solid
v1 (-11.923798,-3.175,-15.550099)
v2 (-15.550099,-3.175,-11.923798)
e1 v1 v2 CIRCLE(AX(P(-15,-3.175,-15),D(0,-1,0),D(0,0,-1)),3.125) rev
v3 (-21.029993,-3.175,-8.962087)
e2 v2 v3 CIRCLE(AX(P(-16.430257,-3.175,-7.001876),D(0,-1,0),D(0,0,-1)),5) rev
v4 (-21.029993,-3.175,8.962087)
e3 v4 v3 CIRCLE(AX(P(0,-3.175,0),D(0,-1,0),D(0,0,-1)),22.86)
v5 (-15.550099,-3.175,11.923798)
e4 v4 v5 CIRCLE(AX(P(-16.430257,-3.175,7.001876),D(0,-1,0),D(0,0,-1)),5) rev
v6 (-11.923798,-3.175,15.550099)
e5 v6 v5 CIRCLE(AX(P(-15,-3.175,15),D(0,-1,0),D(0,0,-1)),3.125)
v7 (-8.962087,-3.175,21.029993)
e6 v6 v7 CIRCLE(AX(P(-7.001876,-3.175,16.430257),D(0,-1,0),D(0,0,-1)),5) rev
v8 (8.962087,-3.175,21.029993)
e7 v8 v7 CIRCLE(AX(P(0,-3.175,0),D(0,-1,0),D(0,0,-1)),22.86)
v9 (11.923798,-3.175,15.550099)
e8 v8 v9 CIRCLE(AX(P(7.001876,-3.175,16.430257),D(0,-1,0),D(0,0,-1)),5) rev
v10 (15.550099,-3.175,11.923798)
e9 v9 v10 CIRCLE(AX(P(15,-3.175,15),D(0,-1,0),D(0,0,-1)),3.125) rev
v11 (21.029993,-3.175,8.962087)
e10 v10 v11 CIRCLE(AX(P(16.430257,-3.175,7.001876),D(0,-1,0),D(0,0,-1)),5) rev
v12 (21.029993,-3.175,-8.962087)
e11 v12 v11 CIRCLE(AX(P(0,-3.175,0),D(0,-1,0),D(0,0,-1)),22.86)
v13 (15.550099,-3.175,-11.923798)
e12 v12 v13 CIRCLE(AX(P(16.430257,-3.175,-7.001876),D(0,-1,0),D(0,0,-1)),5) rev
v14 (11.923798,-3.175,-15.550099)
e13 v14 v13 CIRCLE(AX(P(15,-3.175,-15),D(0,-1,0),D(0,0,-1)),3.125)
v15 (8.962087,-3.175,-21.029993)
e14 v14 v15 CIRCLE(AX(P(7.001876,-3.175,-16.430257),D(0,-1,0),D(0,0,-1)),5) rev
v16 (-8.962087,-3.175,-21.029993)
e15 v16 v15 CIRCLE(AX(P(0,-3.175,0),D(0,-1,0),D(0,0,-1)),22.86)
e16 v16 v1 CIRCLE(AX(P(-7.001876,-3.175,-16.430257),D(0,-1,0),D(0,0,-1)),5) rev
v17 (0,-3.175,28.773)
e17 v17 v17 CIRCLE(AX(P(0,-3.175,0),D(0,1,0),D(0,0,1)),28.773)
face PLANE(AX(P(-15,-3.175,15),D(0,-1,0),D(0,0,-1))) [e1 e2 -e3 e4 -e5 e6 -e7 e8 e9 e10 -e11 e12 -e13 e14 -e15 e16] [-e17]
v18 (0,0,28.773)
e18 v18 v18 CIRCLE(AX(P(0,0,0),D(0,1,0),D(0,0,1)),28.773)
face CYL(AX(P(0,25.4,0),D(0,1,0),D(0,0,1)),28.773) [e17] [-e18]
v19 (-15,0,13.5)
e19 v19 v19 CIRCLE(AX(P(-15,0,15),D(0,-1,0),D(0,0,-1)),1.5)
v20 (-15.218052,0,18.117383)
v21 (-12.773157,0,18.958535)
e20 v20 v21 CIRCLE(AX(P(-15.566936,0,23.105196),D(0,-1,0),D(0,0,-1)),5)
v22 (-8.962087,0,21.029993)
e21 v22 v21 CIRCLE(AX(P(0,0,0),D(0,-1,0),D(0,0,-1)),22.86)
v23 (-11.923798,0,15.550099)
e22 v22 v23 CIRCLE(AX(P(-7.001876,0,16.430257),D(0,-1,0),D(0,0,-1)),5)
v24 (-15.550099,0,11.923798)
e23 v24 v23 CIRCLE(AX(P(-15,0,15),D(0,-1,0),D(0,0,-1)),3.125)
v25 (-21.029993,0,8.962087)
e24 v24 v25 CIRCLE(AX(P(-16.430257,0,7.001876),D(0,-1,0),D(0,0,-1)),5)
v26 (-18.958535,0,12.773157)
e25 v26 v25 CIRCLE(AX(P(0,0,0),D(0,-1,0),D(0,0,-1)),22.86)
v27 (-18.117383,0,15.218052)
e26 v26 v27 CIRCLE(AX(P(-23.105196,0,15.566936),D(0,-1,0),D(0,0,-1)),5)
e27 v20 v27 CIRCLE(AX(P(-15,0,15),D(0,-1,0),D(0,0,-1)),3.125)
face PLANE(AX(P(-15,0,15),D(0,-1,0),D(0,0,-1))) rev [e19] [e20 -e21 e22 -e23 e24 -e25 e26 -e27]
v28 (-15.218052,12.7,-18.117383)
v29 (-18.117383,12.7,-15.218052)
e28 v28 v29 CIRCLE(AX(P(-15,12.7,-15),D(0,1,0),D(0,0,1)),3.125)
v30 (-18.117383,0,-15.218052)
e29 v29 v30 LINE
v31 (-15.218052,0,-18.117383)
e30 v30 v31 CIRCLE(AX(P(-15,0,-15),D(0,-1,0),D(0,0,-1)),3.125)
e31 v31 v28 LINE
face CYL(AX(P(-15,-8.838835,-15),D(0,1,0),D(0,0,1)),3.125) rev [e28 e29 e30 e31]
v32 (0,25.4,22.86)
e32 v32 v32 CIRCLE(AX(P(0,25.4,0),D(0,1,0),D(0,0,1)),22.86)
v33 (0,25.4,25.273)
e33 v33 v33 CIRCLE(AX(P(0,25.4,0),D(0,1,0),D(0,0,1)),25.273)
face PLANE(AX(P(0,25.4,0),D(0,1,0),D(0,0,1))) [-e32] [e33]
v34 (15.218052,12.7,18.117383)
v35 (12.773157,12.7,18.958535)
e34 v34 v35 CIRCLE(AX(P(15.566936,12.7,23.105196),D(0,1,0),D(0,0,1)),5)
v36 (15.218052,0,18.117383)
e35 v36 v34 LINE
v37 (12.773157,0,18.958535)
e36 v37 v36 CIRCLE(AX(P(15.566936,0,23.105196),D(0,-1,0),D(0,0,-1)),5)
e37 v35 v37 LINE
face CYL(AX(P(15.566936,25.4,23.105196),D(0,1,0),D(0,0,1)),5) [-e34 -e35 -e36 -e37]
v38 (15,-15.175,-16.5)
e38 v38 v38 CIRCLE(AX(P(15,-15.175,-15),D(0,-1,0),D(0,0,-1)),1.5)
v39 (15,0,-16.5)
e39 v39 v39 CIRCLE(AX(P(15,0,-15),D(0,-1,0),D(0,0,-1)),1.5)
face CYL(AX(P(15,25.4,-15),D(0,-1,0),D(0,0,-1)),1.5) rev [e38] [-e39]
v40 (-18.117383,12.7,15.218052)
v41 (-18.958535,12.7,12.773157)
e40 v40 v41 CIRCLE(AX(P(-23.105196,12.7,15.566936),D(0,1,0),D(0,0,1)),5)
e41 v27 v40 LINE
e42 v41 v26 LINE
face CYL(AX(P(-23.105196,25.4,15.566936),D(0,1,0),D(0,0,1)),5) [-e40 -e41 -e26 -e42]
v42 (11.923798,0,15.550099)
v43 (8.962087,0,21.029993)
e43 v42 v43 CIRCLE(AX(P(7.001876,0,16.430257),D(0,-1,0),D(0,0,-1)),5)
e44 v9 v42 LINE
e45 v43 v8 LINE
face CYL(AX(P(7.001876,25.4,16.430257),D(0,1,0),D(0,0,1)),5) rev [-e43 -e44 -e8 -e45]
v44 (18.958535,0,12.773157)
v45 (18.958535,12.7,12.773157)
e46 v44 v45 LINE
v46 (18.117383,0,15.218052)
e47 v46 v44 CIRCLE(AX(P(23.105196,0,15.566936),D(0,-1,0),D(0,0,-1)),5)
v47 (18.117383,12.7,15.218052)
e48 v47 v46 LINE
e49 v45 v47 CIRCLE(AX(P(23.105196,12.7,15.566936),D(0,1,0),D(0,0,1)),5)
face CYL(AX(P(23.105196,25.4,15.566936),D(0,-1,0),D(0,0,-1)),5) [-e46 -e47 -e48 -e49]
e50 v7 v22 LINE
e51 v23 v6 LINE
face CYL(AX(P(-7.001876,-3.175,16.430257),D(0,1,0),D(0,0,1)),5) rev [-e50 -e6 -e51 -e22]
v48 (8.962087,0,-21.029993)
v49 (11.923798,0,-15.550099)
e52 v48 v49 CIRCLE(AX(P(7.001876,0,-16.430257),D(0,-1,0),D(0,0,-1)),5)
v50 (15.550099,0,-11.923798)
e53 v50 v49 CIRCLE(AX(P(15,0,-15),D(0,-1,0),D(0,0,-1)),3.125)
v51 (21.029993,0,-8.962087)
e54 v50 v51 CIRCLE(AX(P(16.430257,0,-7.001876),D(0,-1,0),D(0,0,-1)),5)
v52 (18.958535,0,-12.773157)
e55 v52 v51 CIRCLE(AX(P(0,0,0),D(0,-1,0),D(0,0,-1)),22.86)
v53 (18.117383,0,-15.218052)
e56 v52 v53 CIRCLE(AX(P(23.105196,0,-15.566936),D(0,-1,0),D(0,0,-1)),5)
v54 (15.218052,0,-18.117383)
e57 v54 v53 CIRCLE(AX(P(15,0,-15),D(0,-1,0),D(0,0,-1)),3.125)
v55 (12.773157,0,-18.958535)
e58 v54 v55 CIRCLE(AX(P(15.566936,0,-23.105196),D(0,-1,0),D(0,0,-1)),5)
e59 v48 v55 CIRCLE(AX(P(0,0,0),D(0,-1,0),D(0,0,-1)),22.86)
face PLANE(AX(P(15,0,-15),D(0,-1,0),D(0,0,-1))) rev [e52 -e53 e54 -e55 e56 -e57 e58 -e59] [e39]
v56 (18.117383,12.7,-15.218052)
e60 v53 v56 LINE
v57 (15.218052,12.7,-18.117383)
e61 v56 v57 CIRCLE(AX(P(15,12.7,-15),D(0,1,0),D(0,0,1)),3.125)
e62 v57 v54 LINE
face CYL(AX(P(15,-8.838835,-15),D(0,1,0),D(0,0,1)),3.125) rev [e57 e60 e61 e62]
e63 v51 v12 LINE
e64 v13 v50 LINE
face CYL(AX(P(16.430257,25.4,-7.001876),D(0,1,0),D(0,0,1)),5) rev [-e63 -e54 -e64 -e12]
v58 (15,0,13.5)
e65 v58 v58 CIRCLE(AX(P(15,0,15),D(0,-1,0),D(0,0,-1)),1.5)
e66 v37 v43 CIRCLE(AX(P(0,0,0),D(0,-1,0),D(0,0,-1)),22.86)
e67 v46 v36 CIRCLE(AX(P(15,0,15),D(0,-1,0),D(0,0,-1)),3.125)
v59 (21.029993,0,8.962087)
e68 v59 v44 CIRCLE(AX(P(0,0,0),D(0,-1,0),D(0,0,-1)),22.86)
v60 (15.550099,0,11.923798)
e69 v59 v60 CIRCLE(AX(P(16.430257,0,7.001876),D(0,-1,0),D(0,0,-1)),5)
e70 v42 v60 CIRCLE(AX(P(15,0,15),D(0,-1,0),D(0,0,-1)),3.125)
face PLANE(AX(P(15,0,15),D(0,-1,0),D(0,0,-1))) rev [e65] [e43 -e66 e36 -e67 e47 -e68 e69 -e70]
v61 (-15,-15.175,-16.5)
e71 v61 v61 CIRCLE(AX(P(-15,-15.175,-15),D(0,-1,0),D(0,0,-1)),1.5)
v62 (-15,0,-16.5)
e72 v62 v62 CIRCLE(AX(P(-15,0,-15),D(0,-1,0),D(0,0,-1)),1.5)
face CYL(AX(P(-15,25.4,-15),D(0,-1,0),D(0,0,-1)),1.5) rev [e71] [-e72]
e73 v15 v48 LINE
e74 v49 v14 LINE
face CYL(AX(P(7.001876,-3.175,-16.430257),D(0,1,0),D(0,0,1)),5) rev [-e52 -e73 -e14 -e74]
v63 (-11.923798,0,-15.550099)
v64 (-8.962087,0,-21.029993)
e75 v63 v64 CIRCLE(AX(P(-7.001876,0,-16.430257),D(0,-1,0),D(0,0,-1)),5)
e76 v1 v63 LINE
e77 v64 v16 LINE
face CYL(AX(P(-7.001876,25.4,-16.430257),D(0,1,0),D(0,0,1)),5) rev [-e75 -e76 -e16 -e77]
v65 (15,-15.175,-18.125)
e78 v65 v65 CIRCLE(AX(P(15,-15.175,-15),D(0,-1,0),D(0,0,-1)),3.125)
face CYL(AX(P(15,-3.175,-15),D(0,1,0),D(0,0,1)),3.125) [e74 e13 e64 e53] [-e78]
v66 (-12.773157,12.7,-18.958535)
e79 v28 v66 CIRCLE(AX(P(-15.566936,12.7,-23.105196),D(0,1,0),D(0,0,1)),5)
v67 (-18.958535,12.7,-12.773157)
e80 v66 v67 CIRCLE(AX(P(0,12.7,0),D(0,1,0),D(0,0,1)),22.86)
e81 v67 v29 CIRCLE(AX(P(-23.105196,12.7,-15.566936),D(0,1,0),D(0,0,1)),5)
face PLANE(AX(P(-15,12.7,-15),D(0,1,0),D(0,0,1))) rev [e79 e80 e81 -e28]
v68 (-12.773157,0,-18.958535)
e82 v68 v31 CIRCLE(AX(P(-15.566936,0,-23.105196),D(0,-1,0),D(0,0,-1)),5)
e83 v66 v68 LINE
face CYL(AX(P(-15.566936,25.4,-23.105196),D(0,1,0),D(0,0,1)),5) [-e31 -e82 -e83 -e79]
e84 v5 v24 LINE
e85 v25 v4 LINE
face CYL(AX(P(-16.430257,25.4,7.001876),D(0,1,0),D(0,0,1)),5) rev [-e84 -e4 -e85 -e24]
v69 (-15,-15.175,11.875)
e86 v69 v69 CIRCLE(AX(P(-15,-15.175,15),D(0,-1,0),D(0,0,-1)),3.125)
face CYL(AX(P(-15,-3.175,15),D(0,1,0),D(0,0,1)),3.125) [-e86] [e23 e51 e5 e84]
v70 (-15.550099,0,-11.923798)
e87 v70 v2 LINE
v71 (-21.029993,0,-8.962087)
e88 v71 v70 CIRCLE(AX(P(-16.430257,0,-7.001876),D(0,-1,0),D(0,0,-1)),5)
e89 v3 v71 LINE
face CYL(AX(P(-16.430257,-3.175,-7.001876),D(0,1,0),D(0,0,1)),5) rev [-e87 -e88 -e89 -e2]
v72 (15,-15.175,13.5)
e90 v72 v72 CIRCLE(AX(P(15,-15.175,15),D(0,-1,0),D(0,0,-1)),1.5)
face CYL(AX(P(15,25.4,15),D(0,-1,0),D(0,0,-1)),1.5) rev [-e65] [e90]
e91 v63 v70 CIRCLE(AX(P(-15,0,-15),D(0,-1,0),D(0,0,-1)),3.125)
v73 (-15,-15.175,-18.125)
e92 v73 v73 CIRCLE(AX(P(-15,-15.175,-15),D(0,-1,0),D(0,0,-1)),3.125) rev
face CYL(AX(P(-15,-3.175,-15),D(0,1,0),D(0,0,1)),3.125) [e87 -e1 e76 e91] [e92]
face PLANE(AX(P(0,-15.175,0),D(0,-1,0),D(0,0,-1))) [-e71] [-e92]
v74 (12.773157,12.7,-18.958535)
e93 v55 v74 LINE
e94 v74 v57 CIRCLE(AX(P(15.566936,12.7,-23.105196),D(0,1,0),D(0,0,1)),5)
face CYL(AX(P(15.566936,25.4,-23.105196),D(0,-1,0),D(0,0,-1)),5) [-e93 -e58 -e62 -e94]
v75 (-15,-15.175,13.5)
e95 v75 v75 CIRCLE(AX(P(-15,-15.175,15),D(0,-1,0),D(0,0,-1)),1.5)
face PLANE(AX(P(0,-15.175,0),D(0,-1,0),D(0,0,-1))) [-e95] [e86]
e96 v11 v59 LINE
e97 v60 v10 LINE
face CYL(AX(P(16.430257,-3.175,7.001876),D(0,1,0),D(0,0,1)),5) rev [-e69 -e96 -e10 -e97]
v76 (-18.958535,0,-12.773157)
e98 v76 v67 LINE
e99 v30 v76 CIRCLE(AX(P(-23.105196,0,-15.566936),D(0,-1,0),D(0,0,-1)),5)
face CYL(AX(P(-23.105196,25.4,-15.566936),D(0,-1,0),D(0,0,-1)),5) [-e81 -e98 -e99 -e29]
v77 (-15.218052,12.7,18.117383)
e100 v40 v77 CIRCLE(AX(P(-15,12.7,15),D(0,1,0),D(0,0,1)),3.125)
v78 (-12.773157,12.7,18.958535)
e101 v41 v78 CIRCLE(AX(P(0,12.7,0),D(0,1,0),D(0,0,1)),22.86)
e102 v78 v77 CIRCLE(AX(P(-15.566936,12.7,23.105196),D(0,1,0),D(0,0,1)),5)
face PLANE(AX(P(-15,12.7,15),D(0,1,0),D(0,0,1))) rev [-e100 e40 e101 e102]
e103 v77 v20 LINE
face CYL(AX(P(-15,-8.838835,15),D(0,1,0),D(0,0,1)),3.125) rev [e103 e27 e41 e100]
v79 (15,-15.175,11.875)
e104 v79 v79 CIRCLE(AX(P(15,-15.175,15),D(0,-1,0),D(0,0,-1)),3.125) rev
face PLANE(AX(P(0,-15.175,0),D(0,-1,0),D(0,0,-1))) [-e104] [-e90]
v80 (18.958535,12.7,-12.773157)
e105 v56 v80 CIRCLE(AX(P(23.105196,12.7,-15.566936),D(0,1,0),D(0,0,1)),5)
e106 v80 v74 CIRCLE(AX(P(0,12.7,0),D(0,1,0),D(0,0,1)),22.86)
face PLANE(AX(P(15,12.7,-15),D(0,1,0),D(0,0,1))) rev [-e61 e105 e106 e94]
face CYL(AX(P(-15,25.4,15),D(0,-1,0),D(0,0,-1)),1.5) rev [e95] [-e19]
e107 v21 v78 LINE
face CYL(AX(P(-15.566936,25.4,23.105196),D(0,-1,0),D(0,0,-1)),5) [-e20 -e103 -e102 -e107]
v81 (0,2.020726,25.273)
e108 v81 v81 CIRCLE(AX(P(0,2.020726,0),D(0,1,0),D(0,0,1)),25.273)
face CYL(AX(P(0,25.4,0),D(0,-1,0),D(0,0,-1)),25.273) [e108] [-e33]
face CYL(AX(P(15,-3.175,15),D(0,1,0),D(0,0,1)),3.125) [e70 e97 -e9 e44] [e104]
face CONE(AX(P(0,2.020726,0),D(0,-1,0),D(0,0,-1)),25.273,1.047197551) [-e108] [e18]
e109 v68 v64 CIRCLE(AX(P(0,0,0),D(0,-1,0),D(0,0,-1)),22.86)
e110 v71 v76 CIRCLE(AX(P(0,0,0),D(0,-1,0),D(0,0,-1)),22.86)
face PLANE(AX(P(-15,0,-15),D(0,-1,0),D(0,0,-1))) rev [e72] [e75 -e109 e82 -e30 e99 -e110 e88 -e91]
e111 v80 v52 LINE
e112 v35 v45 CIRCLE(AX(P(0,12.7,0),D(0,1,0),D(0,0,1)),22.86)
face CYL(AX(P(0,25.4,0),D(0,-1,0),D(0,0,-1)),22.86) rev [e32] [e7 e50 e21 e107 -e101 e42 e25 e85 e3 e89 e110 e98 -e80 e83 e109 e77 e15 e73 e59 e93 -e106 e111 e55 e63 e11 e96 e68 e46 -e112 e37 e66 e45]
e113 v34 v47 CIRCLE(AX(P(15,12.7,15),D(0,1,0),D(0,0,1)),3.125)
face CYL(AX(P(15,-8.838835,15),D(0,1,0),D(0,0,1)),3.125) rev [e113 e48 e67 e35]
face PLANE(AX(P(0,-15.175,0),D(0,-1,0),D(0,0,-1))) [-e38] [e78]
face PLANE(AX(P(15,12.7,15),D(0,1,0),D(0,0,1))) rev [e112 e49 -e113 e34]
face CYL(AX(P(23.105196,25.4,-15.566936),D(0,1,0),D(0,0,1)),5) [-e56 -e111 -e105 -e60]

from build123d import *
from build123d.topology import SkipClean

# Parameters (mm, degrees)
SKETCH1_R               = 25.273
SKETCH1_R_2             = 22.86
BOSS_EXTRUDE1_DEPTH     = 25.4
SKETCH6_R               = 3.1250000000000004
SKETCH6_R_2             = 3.125000000000001
SKETCH6_R_3             = 3.125000000000005
BOSS_EXTRUDE2_DEPTH     = 3.175
SKETCH5_R               = 3.1250000000000004
SKETCH5_R_2             = 3.125000000000004
SKETCH5_R_3             = 3.125000000000001
CUT_EXTRUDE1_DEPTH      = 12.7
SKETCH10_R              = 25.273
BOSS_EXTRUDE3_DEPTH     = 3.175
CUT_EXTRUDE2_DEPTH      = 44.84756615822593
CUT_EXTRUDE2_DEPTH_BACK = 44.84756615822593
SKETCH3_R               = 1.2500000000000007
FILLET1_R               = 5
FILLET3_R               = 5
SKETCH11_R              = 1.2500000000000013
BOSS_EXTRUDE4_DEPTH     = 12
SKETCH13_R              = 1.5000000000000009
SKETCH13_R_2            = 1.5000000000000002
CUT_EXTRUDE3_DEPTH      = 55.07198619539511
SKETCH14_W              = 3.5
SKETCH14_H              = 3.174999999999997
CHAMFER1_SIZE           = 2.020725942
CHAMFER1_SIZE_2         = 3.5


with BuildPart() as part:
    # Sketch1 → Boss-Extrude1 (new body)
    with BuildSketch(Plane(origin=(0, 0, 0), x_dir=(1, 0, 0), z_dir=(0, 1, 0))):
        with Locations(Location((0, 0, 0), (0, 0, 270))):
            Circle(SKETCH1_R)
        with Locations(Location((0, 0, 0), (0, 0, 270))):
            Circle(SKETCH1_R_2, mode=Mode.SUBTRACT)
    extrude(amount=BOSS_EXTRUDE1_DEPTH)

    # Sketch6 → Boss-Extrude2 (add)
    with BuildSketch(Plane.XZ):
        with Locations(Location((-15.000000000000004, 15, 0), (0, 0, 73.279468642))):
            Circle(SKETCH6_R)
        with Locations(Location((-14.999999999999996, -15.000000000000007, 0), (0, 0, 163.279468642))):
            Circle(SKETCH6_R_2)
        with Locations(Location((15.00000000000001, -14.999999999999993, 0), (0, 0, 16.720531358))):
            Circle(SKETCH6_R)
        with Locations(Location((15.000000000000004, 15, 0), (0, 0, 106.720531358))):
            Circle(SKETCH6_R_3)
    extrude(amount=BOSS_EXTRUDE2_DEPTH)

    # Sketch5 → Cut-Extrude1 (cut)
    with BuildSketch(Plane(origin=(0, 12.7, 0), x_dir=(1, 0, 0), z_dir=(0, 1, 0))):
        with Locations(Location((-14.999999999999996, 15.000000000000007, 0), (0, 0, 90))):
            Circle(SKETCH5_R)
        with Locations(Location((15.00000000000001, 14.999999999999993, 0), (0, 0, 90))):
            Circle(SKETCH5_R)
        with Locations(Location((15.000000000000004, -15, 0), (0, 0, 90))):
            Circle(SKETCH5_R_2)
        with Locations(Location((-15.000000000000004, -15, 0), (0, 0, 90))):
            Circle(SKETCH5_R_3)
    extrude(amount=-CUT_EXTRUDE1_DEPTH, mode=Mode.SUBTRACT)


with BuildPart() as cut_extrude1_piece_1:
    # of the separate pieces the step leaves, piece 1, a body of its own (cut_extrude1_pieces)
    add(part.part.solids().sort_by_distance((0, 0, 25.273))[0])



with BuildPart() as cut_extrude1_piece_2:
    # of the separate pieces the step leaves, piece 2, a body of its own (cut_extrude1_pieces)
    add(part.part.solids().sort_by_distance((14.100925852, -3.175, 17.992873315))[0])


with BuildPart() as cut_extrude1_piece_3:
    # of the separate pieces the step leaves, piece 3, a body of its own (cut_extrude1_pieces)
    add(part.part.solids().sort_by_distance((17.992873315, -3.175, -14.100925852))[0])


with BuildPart() as cut_extrude1_piece_4:
    # of the separate pieces the step leaves, piece 4, a body of its own (cut_extrude1_pieces)
    add(part.part.solids().sort_by_distance((-17.992873315, -3.175, -14.100925852))[0])


with BuildPart() as cut_extrude1_piece_5:
    # of the separate pieces the step leaves, piece 5, a body of its own (cut_extrude1_pieces)
    add(part.part.solids().sort_by_distance((-14.100925852, -3.175, 17.992873315))[0])


with BuildPart() as cut_extrude1_piece_1_1:
    with SkipClean():  # the faces are left unmerged after this step: merging them gives an invalid solid
        add(cut_extrude1_piece_1.part)

        add(cut_extrude1_piece_2.part)  # Boss-Extrude3 merges Cut-Extrude1 piece 2

        add(cut_extrude1_piece_3.part)  # Boss-Extrude3 merges Cut-Extrude1 piece 3

        add(cut_extrude1_piece_4.part)  # Boss-Extrude3 merges Cut-Extrude1 piece 4

        add(cut_extrude1_piece_5.part)  # Boss-Extrude3 merges Cut-Extrude1 piece 5
        # Sketch10 → Boss-Extrude3 (add)
        with BuildSketch(Plane.XZ):
            with Locations(Location((0, 0, 0), (0, 0, 270))):
                Circle(SKETCH10_R)
            with BuildLine():
                ThreePointArc((-17.992873314506625, 14.100925852160042), (-22.86, -7.35e-15), (-17.992873314506618, -14.100925852160044))
                ThreePointArc((-17.992873314506618, -14.100925852160044), (-17.209708691207958, -17.209708691207968), (-14.100925852160033, -17.992873314506628))
                ThreePointArc((-14.100925852160033, -17.992873314506628), (1.155e-14, -22.86), (14.10092585216005, -17.992873314506614))
                ThreePointArc((14.10092585216005, -17.992873314506614), (17.20970869120797, -17.209708691207954), (17.99287331450663, -14.10092585216003))
                ThreePointArc((17.99287331450663, -14.10092585216003), (22.86, 2.54e-15), (17.992873314506628, 14.100925852160033))
                ThreePointArc((17.992873314506628, 14.100925852160033), (17.209708691207968, 17.209708691207965), (14.100925852160037, 17.99287331450662))
                ThreePointArc((14.100925852160037, 17.99287331450662), (-8.75e-15, 22.859999999999996), (-14.10092585216005, 17.992873314506618))
                ThreePointArc((-14.10092585216005, 17.992873314506618), (-17.20970869120796, 17.209708691207958), (-17.992873314506625, 14.100925852160042))
            make_face(mode=Mode.SUBTRACT)
        extrude(amount=BOSS_EXTRUDE3_DEPTH)

    # Sketch3 → Cut-Extrude2 (cut, two sides: drawn at the far end of the back side and taken through both)
    with BuildSketch(Plane(origin=(0, 0, 0), x_dir=(-1, 0, 0), z_dir=(0, -1, 0)).offset(-CUT_EXTRUDE2_DEPTH_BACK)):
        with Locations(Location((-15.00000000000001, 14.999999999999993, 0), (0, 0, 90))):
            Circle(SKETCH3_R)
        with Locations(Location((14.999999999999996, 15.000000000000007, 0), (0, 0, 90))):
            Circle(SKETCH3_R)
        with Locations(Location((15.000000000000004, -15, 0), (0, 0, 90))):
            Circle(SKETCH3_R)
        with Locations(Location((-15.000000000000004, -15, 0), (0, 0, 90))):
            Circle(SKETCH3_R)
    extrude(amount=CUT_EXTRUDE2_DEPTH + CUT_EXTRUDE2_DEPTH_BACK, mode=Mode.SUBTRACT)

    # Fillet1
    # the kernel refuses this fillet: 5 mm, written as the material it adds along each edge
    with BuildSketch(Plane(origin=(14.10092585215273, 0, 17.99287331450443), x_dir=(-0.8608874223501668, 0, 0.5087954854745522), z_dir=(0, -1, 0))) as fillet1_piece_1:
        with BuildLine():
            CenterArc((5.3164306254297475, 4.957201606076887), FILLET1_R, 200.44493479768204, 77.05705788713391)
            ThreePointArc((0.631388974913585, 3.210666541175879), (0.7695099639794132, 1.5160888458409856), (0, 0))
            ThreePointArc((0, 0), (2.984616996499313, -0.19567425701646401), (5.969233992998208, 6e-17))
        make_face()
    extrude(amount=3.175)
    with BuildSketch(Plane(origin=(17.992873314504436, 0, -14.10092585215272), x_dir=(0.5087954854745508, 0, 0.8608874223501678), z_dir=(0, -1, 0))) as fillet1_piece_2:
        with BuildLine():
            CenterArc((5.316430625429749, 4.9572016060768895), FILLET1_R, 200.44493479768207, 77.05705788713385)
            ThreePointArc((0.6313889749135845, 3.2106665411758786), (0.7695099639794142, 1.5160888458409876), (0, 0))
            ThreePointArc((0, 0), (2.984616996499308, -0.19567425701646796), (5.9692339929982055, -1e-16))
        make_face()
    extrude(amount=3.175)
    with BuildSketch(Plane(origin=(-14.100925852160035, 0, -17.992873314506628), x_dir=(0.665348701330496, 0, 0.7465327224159852), z_dir=(0, -1, 0))) as fillet1_piece_3:
        with BuildLine():
            CenterArc((5.889888167974704, -4.259988230871161), FILLET1_R, 121.57038627249773, 77.05705788713396)
            ThreePointArc((1.1518105546258381, -5.857054456762352), (0.3839083174921323, -2.9662841122227417), (0, 0))
            ThreePointArc((0, 0), (1.6360800466596406, -0.46250735570552437), (3.2721600933192807, 3e-17))
        make_face()
    extrude(amount=3.175)
    with BuildSketch(Plane(origin=(-17.992873314506625, 0, 14.100925852160042), x_dir=(0.7465327224159842, 0, -0.6653487013304972), z_dir=(0, -1, 0))) as fillet1_piece_4:
        with BuildLine():
            CenterArc((5.889888167974704, -4.259988230871161), FILLET1_R, 121.57038627249773, 77.05705788713396)
            ThreePointArc((1.1518105546258386, -5.857054456762347), (0.38390831749212756, -2.96628411222273), (0, 0))
            ThreePointArc((0, 0), (1.6360800466596437, -0.4625073557055245), (3.2721600933192807, 8e-17))
        make_face()
    extrude(amount=3.175)
    with BuildSketch(Plane(origin=(17.99287331450663, 0, 14.100925852160035), x_dir=(-0.7465327224159862, 0, -0.665348701330495), z_dir=(0, -1, 0))) as fillet1_piece_5:
        with BuildLine():
            CenterArc((5.889888167974704, 4.2599882308711665), FILLET1_R, 161.3725558403684, 77.05705788713396)
            ThreePointArc((1.1518105546258386, 5.857054456762349), (0.38390831749213894, 2.9662841122227275), (0, 0))
            ThreePointArc((0, 0), (1.6360800466596428, 0.46250735570552437), (3.272160093319286, 6e-17))
        make_face()
    extrude(amount=3.175)
    with BuildSketch(Plane(origin=(-17.992873314504422, 0, -14.100925852152734), x_dir=(-0.5087954854745543, 0, 0.8608874223501657), z_dir=(0, -1, 0))) as fillet1_piece_6:
        with BuildLine():
            CenterArc((5.316430625429729, -4.957201606076887), FILLET1_R, 82.49800731518394, 77.05705788713391)
            ThreePointArc((0.631388974913567, -3.2106665411758706), (0.769509963979407, -1.5160888458409818), (0, 0))
            ThreePointArc((0, 0), (2.984616996499318, 0.19567425701647095), (5.969233992998199, -2.4e-16))
        make_face()
    extrude(amount=3.175)
    with BuildSketch(Plane(origin=(14.100925852160053, 0, -17.992873314506614), x_dir=(-0.860887422350645, 0, -0.5087954854737433), z_dir=(0, -1, 0))) as fillet1_piece_7:
        with BuildLine():
            CenterArc((5.31643062543959, -4.9572016060775015), FILLET1_R, 82.49800731523791, 77.05705788713382)
            ThreePointArc((0.631388974921786, -3.210666541180892), (0.7695099639852782, -1.5160888458421276), (0, 0))
            ThreePointArc((0, 0), (2.9846169965017046, 0.1956742570136652), (5.969233993003391, -1.1e-16))
        make_face()
    extrude(amount=3.175)
    with BuildSketch(Plane(origin=(-14.10092585215273, 0, 17.992873314504426), x_dir=(0.6653487013295846, 0, -0.7465327224167976), z_dir=(0, -1, 0))) as fillet1_piece_8:
        with BuildLine():
            CenterArc((5.889888167962995, 4.25998823087436), FILLET1_R, 161.3725558404384, 77.05705788713385)
            ThreePointArc((1.1518105546121764, 5.857054456759753), (0.38390831748250376, 2.9662841122217563), (0, 0))
            ThreePointArc((0, 0), (1.6360800466563894, 0.4625073557035249), (3.2721600933127744, -3e-17))
        make_face()
    extrude(amount=3.175)

    # Fillet3
    fillet3_edges = [cut_extrude1_piece_1_1.edges().sort_by_distance(p)[0] for p in [
        (17.99287331450661, 6.35, 14.100925852160058),
        (14.10092585216007, 6.35, -17.9928733145066),
        (-17.992873314506618, 6.349999999999999, -14.100925852160048),
        (14.100925852160062, 6.35, 17.992873314506607),
        (-14.100925852160064, 6.35, 17.992873314506603),
        (-14.100925852160053, 6.35, -17.992873314506614),
        (17.99287331450662, 6.35, -14.100925852160046),
        (-17.99287331450661, 6.35, 14.100925852160056),
    ]]
    fillet(fillet3_edges, radius=FILLET3_R)

    # Sketch11 → Boss-Extrude4 (add)
    # profile 1 of 4: a face of its own
    with SkipClean():  # the faces are left unmerged after this step: merging them gives an invalid solid
        with BuildSketch(Plane.XZ.offset(3.175)):
            with BuildLine():
                ThreePointArc((-15.550098731860036, 11.92379838352458), (-12.994187638020772, 12.60368162204366), (-11.875000000000004, 15))
                ThreePointArc((-11.875000000000004, 15), (-11.887223502121808, 15.276129451991556), (-11.923798383524584, 15.550098731860032))
                ThreePointArc((-11.923798383524584, 15.550098731860032), (-17.209708691207965, 17.20970869120796), (-15.550098731860036, 11.92379838352458))
            make_face()
            with Locations(Location((-15.000000000000004, 15, 0), (0, 0, 270))):
                Circle(SKETCH11_R, mode=Mode.SUBTRACT)
        # profile 2 of 4: a face of its own
        with BuildSketch(Plane.XZ.offset(3.175)):
            with BuildLine():
                ThreePointArc((15.550098731860036, 11.92379838352458), (17.39631837795634, 12.994187638020769), (18.125000000000004, 15))
                ThreePointArc((18.125000000000004, 15), (15.27612945199156, 18.112776497878194), (11.923798383524584, 15.550098731860034))
                ThreePointArc((11.923798383524579, 15.550098731860034), (12.790291308792039, 12.790291308792035), (15.550098731860038, 11.923798383524574))
            make_face()
            with Locations(Location((15.000000000000004, 15, 0), (0, 0, 270))):
                Circle(SKETCH11_R, mode=Mode.SUBTRACT)
        # profile 3 of 4: a face of its own
        with BuildSketch(Plane.XZ.offset(3.175)):
            with BuildLine():
                ThreePointArc((11.923798383524582, -15.550098731860029), (15.276129451991556, -18.112776497878198), (18.125000000000004, -15))
                ThreePointArc((18.125000000000004, -15), (17.396318377956344, -12.99418763802077), (15.55009873186004, -11.92379838352458))
                ThreePointArc((15.550098731860041, -11.923798383524572), (12.790291308792046, -12.790291308792032), (11.92379838352459, -15.550098731860029))
            make_face()
            with Locations(Location((15.000000000000004, -15, 0), (0, 0, 270))):
                Circle(SKETCH11_R, mode=Mode.SUBTRACT)
        # profile 4 of 4: a face of its own
        with BuildSketch(Plane.XZ.offset(3.175)):
            with BuildLine():
                ThreePointArc((-11.923798383524584, -15.55009873186004), (-11.887223502121808, -15.27612945199156), (-11.875000000000004, -15))
                ThreePointArc((-11.875000000000004, -15), (-12.99418763802077, -12.603681622043663), (-15.550098731860032, -11.923798383524579))
                ThreePointArc((-15.550098731860032, -11.923798383524579), (-17.209708691207968, -17.209708691207958), (-11.923798383524584, -15.55009873186004))
            make_face()
            with Locations(Location((-15.000000000000004, -15, 0), (0, 0, 270))):
                Circle(SKETCH11_R, mode=Mode.SUBTRACT)
        extrude(amount=BOSS_EXTRUDE4_DEPTH)

    # Sketch13 → Cut-Extrude3 (cut, through all)
    with SkipClean():  # the faces are left unmerged after this step: merging them gives an invalid solid
        with BuildSketch(Plane.XZ.offset(15.175)):
            with Locations(Location((-15.000000000000004, 15, 0), (0, 0, 270))):
                Circle(SKETCH13_R)
            with Locations(Location((15.000000000000004, 15, 0), (0, 0, 270))):
                Circle(SKETCH13_R_2)
            with Locations(Location((15.00000000000001, -14.999999999999993, 0), (0, 0, 270))):
                Circle(SKETCH13_R_2)
            with Locations(Location((-14.999999999999996, -15.000000000000007, 0), (0, 0, 270))):
                Circle(SKETCH13_R_2)
        extrude(amount=-CUT_EXTRUDE3_DEPTH, mode=Mode.SUBTRACT)

    # Sketch14 → Revolve1 (revolve)
    with SkipClean():  # the faces are left unmerged after this step: merging them gives an invalid solid
        with BuildSketch(Plane(origin=(0, 0, 0), x_dir=(0, 0, -1), z_dir=(1, 0, 0)), mode=Mode.PRIVATE) as revolve1_sk:
            with Locations((-27.023000000000003, -1.5874999999999986)):
                Rectangle(SKETCH14_W, SKETCH14_H)
        revolve(revolve1_sk.sketch.rotate(Axis((0, 25.4, 0), (0, -1, 0)), 156.91836179), axis=Axis((0, 25.4, 0), (0, -1, 0)))

    # Chamfer1
    # the kernel refuses this chamfer: 3.5, 2.020725942 mm, written as the material it adds along each edge
    with BuildSketch(Plane(origin=(0, 0, 0), x_dir=(-2.1e-16, 0, 1), z_dir=(1, 0, 2.1e-16))) as chamfer1_piece_1_section:
        Polygon((25.273, -CHAMFER1_SIZE), (25.273000000000007 + CHAMFER1_SIZE_2, 0), (25.273000000000007, 0), align=None)
    chamfer1_piece_1 = revolve(axis=Axis((0, 0, 0), (0, -1, 0)), revolution_arc=156.91836178999998, mode=Mode.PRIVATE)
    chamfer1_piece_1 = chamfer1_piece_1 & Plane(origin=(0, 0.988052825602503, 0), x_dir=(-0.39204231787014937, 0, -0.9199471838094841), z_dir=(0, -1, 0)) * Cylinder(28.773, 116, mode=Mode.PRIVATE)
    add(chamfer1_piece_1)
    with BuildSketch(Plane(origin=(0, 0, 0), x_dir=(-1.8e-16, 0, 1), z_dir=(-1, 0, -1.8e-16))) as chamfer1_piece_2_section:
        Polygon((25.273, CHAMFER1_SIZE), (25.273 + CHAMFER1_SIZE_2, 0), (25.273, 0), align=None)
    chamfer1_piece_2 = revolve(axis=Axis((0, 0, 0), (0, 1, 0)), revolution_arc=180, mode=Mode.PRIVATE)
    chamfer1_piece_2 = chamfer1_piece_2 & Plane(origin=(0, 0.9853703609509775, 0), x_dir=(-0.39204231787014937, 0, -0.9199471838094841), z_dir=(0, -1, 0)) * Cylinder(28.773, 116, mode=Mode.PRIVATE)
    add(chamfer1_piece_2)
    with BuildSketch(Plane(origin=(0, 0, 0), x_dir=(-0.39204231787014926, 0, -0.919947183809484), z_dir=(-0.919947183809484, 0, 0.39204231787014926))) as chamfer1_piece_3_section:
        Polygon((25.272999999999993, -CHAMFER1_SIZE), (25.273000000000003 + CHAMFER1_SIZE_2, 0), (25.273000000000003, 0), align=None)
    chamfer1_piece_3 = revolve(axis=Axis((0, 0, 0), (0, -1, 0)), revolution_arc=23.08163820999999, mode=Mode.PRIVATE)
    chamfer1_piece_3 = chamfer1_piece_3 & Plane(origin=(0, 0.6408535162382758, 0), x_dir=(-0.39204231787014937, 0, -0.9199471838094841), z_dir=(0, -1, 0)) * Cylinder(28.773, 116, mode=Mode.PRIVATE)
    add(chamfer1_piece_3)


solid = cut_extrude1_piece_1_1.part
